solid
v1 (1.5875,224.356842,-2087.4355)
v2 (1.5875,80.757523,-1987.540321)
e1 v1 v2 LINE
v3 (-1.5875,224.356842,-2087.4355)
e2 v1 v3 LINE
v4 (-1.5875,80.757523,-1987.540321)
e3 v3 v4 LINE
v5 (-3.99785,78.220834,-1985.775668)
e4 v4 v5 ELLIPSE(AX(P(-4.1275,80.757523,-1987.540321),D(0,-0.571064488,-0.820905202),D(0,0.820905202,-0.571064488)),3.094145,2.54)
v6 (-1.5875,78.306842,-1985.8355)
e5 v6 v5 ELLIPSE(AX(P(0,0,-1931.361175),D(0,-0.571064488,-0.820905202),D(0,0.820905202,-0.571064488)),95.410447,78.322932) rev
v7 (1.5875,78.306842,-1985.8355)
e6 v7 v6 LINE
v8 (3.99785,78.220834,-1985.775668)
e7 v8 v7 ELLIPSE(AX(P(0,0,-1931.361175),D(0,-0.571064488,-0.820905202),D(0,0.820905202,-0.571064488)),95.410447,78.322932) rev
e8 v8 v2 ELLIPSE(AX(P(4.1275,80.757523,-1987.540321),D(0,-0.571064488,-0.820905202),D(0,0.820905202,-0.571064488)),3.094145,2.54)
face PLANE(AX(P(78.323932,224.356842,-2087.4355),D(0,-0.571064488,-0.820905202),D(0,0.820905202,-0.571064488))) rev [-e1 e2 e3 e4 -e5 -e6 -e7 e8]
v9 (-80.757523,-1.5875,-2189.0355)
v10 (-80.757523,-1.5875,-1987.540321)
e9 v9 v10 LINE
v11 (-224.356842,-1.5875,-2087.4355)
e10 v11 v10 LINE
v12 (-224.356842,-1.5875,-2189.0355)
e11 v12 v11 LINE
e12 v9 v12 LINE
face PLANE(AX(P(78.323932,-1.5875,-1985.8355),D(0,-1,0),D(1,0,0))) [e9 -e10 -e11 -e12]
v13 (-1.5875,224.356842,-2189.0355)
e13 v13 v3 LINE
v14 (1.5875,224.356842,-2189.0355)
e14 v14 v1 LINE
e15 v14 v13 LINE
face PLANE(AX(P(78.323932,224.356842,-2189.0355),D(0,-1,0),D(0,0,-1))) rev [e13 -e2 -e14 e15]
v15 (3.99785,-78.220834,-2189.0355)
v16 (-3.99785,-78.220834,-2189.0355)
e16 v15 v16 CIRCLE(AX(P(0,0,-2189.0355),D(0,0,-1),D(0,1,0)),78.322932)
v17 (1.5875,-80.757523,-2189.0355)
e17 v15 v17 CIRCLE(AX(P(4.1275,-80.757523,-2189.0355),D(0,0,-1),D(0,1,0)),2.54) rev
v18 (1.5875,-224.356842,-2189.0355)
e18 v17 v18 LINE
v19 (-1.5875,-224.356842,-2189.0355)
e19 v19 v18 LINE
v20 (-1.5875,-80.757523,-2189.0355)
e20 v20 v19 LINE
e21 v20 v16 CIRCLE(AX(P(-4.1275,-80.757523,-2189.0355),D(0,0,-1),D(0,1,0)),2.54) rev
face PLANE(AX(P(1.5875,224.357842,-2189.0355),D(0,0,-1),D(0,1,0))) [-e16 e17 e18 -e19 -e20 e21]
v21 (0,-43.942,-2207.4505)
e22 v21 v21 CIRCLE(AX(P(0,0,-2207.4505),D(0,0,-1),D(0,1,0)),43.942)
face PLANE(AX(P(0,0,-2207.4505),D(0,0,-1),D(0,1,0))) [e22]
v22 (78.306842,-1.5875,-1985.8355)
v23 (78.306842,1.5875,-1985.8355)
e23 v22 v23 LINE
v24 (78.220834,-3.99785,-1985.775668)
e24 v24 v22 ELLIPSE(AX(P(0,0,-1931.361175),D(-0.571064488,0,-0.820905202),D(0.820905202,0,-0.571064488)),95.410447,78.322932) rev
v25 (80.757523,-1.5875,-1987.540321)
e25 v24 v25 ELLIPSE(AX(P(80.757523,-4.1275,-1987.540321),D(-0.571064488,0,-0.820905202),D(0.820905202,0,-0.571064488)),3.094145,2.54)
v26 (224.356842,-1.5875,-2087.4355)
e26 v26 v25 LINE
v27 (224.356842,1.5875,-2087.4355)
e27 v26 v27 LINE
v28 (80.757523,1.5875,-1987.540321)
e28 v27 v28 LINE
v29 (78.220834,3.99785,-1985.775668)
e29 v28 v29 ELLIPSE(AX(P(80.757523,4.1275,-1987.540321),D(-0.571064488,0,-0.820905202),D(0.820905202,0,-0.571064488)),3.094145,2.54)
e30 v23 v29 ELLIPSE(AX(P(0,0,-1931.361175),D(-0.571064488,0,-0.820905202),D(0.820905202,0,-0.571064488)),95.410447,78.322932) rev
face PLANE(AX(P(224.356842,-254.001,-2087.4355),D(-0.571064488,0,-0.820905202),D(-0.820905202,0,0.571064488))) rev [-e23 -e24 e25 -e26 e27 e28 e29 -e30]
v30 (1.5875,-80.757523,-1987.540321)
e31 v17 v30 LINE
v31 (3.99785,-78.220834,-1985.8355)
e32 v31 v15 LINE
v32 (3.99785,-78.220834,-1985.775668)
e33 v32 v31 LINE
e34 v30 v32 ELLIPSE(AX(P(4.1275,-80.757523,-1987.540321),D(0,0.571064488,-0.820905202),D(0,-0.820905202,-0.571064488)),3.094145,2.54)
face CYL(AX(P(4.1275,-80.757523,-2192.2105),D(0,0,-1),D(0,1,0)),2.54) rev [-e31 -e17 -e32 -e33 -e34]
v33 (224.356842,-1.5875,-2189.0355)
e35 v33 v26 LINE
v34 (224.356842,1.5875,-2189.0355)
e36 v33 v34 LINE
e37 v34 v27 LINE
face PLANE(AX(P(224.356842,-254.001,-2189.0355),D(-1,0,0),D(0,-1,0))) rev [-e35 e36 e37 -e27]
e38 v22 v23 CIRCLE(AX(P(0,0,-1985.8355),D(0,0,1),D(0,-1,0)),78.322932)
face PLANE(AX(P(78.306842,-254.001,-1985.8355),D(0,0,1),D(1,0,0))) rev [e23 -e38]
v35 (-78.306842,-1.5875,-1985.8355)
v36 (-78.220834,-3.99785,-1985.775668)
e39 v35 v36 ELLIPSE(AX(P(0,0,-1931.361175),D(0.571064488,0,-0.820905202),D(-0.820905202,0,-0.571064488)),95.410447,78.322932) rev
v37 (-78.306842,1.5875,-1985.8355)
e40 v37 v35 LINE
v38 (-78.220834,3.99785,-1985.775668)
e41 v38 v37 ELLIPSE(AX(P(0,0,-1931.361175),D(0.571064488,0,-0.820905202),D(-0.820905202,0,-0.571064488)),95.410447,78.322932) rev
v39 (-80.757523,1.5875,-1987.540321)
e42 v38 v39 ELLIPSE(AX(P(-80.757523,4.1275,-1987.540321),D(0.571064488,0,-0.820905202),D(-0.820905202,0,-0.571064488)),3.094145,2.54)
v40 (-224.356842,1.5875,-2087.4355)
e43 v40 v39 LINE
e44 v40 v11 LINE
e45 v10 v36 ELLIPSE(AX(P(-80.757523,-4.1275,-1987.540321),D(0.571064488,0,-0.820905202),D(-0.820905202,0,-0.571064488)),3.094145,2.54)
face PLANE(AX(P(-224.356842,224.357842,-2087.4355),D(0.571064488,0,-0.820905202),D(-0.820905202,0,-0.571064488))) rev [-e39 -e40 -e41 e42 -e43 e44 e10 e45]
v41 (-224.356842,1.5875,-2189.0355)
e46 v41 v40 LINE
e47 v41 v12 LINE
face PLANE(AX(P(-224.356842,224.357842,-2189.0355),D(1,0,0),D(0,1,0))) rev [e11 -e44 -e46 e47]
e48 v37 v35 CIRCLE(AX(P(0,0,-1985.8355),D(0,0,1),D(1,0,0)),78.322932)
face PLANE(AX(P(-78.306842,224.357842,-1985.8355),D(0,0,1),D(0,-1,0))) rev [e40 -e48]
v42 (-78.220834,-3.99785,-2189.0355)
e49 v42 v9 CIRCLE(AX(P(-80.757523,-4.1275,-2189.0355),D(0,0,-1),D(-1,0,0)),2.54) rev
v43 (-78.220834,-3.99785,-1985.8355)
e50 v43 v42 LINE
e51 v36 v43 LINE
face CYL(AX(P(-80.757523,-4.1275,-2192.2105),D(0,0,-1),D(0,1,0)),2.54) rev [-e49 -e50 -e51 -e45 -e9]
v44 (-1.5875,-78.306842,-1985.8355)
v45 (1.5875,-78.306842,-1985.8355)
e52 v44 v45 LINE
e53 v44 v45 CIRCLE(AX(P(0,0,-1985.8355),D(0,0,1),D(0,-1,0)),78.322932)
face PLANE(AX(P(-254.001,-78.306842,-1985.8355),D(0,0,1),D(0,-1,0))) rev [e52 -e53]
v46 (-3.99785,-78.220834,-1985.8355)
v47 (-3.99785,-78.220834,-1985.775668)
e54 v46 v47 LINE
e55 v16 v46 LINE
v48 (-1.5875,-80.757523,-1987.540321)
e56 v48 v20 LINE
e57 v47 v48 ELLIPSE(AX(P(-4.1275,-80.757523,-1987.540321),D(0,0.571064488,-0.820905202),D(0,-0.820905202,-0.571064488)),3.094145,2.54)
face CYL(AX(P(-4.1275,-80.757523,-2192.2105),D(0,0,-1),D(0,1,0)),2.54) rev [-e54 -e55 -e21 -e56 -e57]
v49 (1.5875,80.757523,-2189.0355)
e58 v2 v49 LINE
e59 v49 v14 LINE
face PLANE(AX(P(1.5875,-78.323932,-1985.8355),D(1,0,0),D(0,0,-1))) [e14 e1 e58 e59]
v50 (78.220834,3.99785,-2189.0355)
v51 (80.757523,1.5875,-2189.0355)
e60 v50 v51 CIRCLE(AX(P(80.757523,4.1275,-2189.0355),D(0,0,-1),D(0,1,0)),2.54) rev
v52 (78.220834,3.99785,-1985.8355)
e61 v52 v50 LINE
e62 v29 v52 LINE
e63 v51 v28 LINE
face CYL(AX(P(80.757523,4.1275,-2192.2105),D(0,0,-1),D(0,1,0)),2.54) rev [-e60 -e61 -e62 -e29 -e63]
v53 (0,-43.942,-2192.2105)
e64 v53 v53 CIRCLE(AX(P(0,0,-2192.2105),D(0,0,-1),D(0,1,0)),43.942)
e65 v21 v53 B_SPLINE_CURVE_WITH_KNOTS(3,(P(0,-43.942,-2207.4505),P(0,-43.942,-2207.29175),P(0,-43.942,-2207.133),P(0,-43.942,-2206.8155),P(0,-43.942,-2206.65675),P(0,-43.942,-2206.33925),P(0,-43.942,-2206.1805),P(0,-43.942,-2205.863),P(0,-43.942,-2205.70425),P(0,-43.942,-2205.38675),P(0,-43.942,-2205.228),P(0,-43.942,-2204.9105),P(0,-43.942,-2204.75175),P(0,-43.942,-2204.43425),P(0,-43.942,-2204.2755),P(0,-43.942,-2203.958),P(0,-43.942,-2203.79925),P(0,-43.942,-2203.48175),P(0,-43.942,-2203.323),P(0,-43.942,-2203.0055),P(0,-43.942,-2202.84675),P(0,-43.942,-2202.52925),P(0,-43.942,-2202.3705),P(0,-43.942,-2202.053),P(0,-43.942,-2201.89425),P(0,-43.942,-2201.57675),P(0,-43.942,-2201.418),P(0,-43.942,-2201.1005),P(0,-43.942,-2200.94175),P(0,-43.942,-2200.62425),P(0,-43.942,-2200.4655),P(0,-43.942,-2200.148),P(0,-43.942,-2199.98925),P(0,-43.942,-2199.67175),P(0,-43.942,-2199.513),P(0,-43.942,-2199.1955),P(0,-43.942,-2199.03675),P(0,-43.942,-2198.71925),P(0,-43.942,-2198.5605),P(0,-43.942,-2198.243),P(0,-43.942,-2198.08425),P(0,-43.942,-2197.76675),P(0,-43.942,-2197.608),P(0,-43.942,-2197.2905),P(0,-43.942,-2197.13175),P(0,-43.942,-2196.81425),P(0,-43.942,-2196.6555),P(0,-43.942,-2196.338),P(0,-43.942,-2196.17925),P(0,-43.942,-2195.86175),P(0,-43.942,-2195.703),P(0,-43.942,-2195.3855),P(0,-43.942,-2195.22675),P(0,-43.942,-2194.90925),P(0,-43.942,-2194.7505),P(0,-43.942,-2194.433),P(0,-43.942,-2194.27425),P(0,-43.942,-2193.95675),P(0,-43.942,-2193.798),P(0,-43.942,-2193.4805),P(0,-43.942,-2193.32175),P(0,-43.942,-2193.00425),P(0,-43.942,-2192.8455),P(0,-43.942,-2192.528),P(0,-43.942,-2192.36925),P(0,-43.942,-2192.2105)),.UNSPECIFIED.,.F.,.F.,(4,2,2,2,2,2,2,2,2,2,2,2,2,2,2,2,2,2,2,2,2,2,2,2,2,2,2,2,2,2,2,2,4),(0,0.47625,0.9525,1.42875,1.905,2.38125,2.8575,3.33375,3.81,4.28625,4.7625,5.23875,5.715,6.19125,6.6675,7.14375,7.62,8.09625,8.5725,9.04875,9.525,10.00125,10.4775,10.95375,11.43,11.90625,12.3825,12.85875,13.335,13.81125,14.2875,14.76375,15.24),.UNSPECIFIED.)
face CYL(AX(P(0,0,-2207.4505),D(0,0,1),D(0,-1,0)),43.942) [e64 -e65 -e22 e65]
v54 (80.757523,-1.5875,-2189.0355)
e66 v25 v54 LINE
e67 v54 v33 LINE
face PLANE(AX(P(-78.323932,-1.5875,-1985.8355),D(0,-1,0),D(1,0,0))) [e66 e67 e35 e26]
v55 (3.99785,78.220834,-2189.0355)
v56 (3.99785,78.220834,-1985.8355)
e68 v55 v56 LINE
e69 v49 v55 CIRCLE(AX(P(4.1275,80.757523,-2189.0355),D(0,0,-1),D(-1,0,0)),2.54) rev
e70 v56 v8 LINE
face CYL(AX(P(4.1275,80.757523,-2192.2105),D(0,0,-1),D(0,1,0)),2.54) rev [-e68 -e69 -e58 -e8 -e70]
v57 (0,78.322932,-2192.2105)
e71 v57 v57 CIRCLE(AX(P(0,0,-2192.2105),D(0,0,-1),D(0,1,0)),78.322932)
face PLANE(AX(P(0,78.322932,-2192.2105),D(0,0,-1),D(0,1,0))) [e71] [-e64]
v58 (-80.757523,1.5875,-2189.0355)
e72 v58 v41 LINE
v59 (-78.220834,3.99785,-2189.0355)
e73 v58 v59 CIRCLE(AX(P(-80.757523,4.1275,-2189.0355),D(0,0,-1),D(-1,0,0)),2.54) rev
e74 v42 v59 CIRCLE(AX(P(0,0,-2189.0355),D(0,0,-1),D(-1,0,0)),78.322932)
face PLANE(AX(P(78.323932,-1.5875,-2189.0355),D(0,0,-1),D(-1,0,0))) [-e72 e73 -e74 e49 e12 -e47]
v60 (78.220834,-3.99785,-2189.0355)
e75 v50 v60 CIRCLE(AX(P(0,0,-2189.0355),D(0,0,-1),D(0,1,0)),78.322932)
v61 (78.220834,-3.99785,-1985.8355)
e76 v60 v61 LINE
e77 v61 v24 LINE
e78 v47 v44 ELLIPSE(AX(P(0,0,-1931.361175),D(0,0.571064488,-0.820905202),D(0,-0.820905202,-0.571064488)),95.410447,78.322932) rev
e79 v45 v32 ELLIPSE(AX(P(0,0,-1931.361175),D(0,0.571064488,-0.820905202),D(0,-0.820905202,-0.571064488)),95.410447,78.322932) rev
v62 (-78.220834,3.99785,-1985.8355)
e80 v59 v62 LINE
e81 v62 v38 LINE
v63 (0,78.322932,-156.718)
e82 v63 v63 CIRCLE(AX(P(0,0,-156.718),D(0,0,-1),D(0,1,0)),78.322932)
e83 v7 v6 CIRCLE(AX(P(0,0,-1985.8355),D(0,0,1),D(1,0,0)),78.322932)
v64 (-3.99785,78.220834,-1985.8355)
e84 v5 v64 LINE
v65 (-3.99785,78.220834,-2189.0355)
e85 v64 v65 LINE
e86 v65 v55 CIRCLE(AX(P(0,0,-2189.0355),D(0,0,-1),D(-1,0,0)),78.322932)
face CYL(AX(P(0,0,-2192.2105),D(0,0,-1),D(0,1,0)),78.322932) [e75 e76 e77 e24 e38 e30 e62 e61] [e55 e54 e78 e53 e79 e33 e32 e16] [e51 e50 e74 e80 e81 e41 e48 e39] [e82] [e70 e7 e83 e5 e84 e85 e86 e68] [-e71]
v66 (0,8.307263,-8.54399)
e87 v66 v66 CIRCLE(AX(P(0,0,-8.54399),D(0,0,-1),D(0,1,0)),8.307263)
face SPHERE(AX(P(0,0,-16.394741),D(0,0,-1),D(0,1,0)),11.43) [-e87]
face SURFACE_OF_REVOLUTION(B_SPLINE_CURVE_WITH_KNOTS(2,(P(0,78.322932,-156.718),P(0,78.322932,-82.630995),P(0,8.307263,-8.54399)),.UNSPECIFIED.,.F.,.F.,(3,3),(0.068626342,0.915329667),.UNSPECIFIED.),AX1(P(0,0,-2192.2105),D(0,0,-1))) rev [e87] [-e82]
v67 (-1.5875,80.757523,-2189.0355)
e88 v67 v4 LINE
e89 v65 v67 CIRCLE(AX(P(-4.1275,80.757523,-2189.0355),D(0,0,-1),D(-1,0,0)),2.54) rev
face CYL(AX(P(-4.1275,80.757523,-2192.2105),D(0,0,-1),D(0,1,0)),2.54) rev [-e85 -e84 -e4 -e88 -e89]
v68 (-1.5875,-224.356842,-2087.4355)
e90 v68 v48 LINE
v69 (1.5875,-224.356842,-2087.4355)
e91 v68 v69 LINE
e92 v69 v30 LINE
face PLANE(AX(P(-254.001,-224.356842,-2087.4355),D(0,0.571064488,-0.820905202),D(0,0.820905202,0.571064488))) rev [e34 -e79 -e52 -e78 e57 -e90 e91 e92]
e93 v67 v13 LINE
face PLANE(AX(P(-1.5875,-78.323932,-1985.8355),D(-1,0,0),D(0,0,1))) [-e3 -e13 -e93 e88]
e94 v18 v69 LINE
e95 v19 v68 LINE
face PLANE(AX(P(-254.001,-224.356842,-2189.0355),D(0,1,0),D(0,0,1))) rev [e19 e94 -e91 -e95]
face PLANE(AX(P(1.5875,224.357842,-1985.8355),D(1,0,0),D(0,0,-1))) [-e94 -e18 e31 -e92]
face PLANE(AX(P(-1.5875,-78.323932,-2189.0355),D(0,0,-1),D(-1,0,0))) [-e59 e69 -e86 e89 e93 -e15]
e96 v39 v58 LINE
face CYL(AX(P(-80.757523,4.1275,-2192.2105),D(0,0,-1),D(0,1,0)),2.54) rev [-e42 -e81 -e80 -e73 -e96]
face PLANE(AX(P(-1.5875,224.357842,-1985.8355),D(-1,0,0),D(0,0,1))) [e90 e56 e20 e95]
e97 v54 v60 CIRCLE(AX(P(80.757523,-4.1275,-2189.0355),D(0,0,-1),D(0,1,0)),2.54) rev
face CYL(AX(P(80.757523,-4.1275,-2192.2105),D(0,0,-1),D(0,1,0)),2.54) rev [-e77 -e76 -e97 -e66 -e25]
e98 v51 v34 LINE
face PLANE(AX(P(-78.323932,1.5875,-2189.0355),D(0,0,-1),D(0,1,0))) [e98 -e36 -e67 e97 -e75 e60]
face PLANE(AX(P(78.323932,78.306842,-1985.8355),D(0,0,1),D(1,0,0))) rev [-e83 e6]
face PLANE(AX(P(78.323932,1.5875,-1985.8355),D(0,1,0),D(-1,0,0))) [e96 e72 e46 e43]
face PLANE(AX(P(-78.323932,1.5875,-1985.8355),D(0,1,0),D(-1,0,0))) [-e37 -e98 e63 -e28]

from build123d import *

# Parameters (mm, degrees)
SKETCH3_R                = 43.942
BOSS_EXTRUDE1_DEPTH      = 15.24
BOSS_EXTRUDE2_REACH      = 2235.699
BOSS_EXTRUDE2_END_RADIUS = 78.32293196
SKETCH4_W                = 3.175
SKETCH4_H                = 203.2
CUT_EXTRUDE1_REACH       = 2225.452
FILLET1_R                = 2.54
CIRPATTERN1_COUNT        = 4
FILLET1_OF_CIRPATTERN1_R = 2.54


with BuildPart() as part:
    # Sketch2 → Revolve1 (revolve)
    with BuildSketch(Plane(origin=(0, 0, 0), x_dir=(0, 0, -1), z_dir=(1, 0, 0))):
        with BuildLine():
            Line((156.718, 78.322932), (2192.2105, 78.322932))
            Line((2192.2105, 78.322932), (2192.2105, 4e-08))
            Line((2192.2105, 4e-08), (4.964740615, 4e-08))
            ThreePointArc((4.964740615, 4e-08), (5.897622526, 4.522765989), (8.543990278, 8.307263076))
            add(Edge.make_bspline(
                [(8.543990278, 8.307263076), (82.630995139, 78.322932), (156.718, 78.322932)],
                knots=[0.068626342, 0.068626342, 0.068626342, 0.915329667, 0.915329667, 0.915329667], degree=2))
        make_face()
    revolve(axis=Axis((0, 4e-08, -2192.2105), (0, 0, 1)))

    # Sketch3 → Boss-Extrude1 (add)
    with BuildSketch(Plane(origin=(0, 0, -2192.2105), x_dir=(-1, 0, 0), z_dir=(0, 0, -1))):
        with Locations(Location((0, 0, 0), (0, 0, 270))):
            Circle(SKETCH3_R)
    extrude(amount=BOSS_EXTRUDE1_DEPTH)

    # Boss-Extrude2: up to this cylinder (the profile starts outside it)
    boss_extrude2_end = Plane(origin=(0, 4e-08, -2087.4355), z_dir=(0, 0, -1)) * Cylinder(BOSS_EXTRUDE2_END_RADIUS, 4629.043863919, mode=Mode.PRIVATE)
    # Sketch4 → Boss-Extrude2 (add, up to the surface)
    with BuildSketch(Plane(origin=(0, 254, 0), x_dir=(1, 0, 0), z_dir=(0, 1, 0)), mode=Mode.PRIVATE) as boss_extrude2_sk1:
        with Locations((0, 2087.4355)):
            Rectangle(SKETCH4_W, SKETCH4_H)
    boss_extrude2_tool1 = extrude(boss_extrude2_sk1.sketch, amount=-BOSS_EXTRUDE2_REACH, mode=Mode.PRIVATE) - boss_extrude2_end
    boss_extrude2 = boss_extrude2_tool1.solids().sort_by_distance((0, 254, -2087.4355))[0]
    add(boss_extrude2)

    # Sketch5 → Cut-Extrude1 (cut, up to next)
    with BuildSketch(Plane.ZY.offset(1.5875), mode=Mode.PRIVATE) as cut_extrude1_sk1:
        Polygon((-2189.0355, 224.356842107), (-2087.4355, 224.356842107), (-1985.8355, 78.306842107), (-1985.8355, 254), (-2189.0355, 254), align=None)
    cut_extrude1_tool1 = extrude(cut_extrude1_sk1.sketch, amount=-CUT_EXTRUDE1_REACH, mode=Mode.PRIVATE) & part.part
    cut_extrude1 = cut_extrude1_tool1.solids().sort_by_distance((-1.5875, 204.128915, -2050.052252))[0]
    add(cut_extrude1, mode=Mode.SUBTRACT)

    # Fillet1
    # the kernel refuses this fillet: 2.54 mm, written as the material it adds along each edge
    with BuildSketch(Plane(origin=(-1.5875, 78.306842107, -1979.708797857), x_dir=(-0.9993639751492599, -0.03566013423796214, 0), z_dir=(0, 0, -1))) as fillet1_piece_1_section:
        with BuildLine():
            CenterArc((2.450992889, 2.539698904), FILLET1_R, 182.043608469, 87.074170623)
            Line((-0.087391608, 2.449122163), (0, 0))
            ThreePointArc((0, 0), (1.205942189, 0.009284527), (2.411884379, 0))
        make_face()
    fillet1_piece_1 = extrude(amount=209.326702143, mode=Mode.PRIVATE)
    fillet1_piece_1 = split(fillet1_piece_1, bisect_by=Plane(origin=(-3.095055571, 78.248638535, -1985.795010558), z_dir=(0, -0.5710644881985977, -0.8209052017854886)), keep=Keep.TOP, mode=Mode.PRIVATE)
    add(fillet1_piece_1)
    with BuildSketch(Plane(origin=(1.5875, 78.306842107, -1979.708797857), x_dir=(0.9993639751492599, -0.035660134237962375, 0), z_dir=(0, 0, -1))) as fillet1_piece_2_section:
        with BuildLine():
            CenterArc((2.450992889, -2.539698904), FILLET1_R, 90.882220908, 87.074170623)
            Line((-0.087391608, -2.449122163), (0, 0))
            ThreePointArc((0, 0), (1.205942189, -0.009284527), (2.411884379, 0))
        make_face()
    fillet1_piece_2 = extrude(amount=209.326702143, mode=Mode.PRIVATE)
    fillet1_piece_2 = split(fillet1_piece_2, bisect_by=Plane(origin=(3.095055571, 78.248638535, -1985.795010558), z_dir=(0, -0.5710644881985977, -0.8209052017854886)), keep=Keep.TOP, mode=Mode.PRIVATE)
    add(fillet1_piece_2)

    # CirPattern1: Boss-Extrude2, Cut-Extrude1 ×4 about axis
    cirpattern1_axis = Axis((0, 1.7e-08, 0), (0, 0, 1))
    add([boss_extrude2.rotate(cirpattern1_axis, i * 360 / CIRPATTERN1_COUNT) for i in range(1, CIRPATTERN1_COUNT)])
    add([cut_extrude1.rotate(cirpattern1_axis, i * 360 / CIRPATTERN1_COUNT) for i in range(1, CIRPATTERN1_COUNT)], mode=Mode.SUBTRACT)

    # Fillet1 of CirPattern1
    # the kernel refuses this fillet: 2.54 mm, written as the material it adds along each edge
    with BuildSketch(Plane(origin=(-78.306842067, -1.587499983, -1979.708797917), x_dir=(0.03566013452716192, -0.9993639751389404, 0), z_dir=(0, 0, -1))) as fillet1_of_cirpattern1_piece_1_section:
        with BuildLine():
            CenterArc((2.450992888, 2.539698904), FILLET1_OF_CIRPATTERN1_R, 182.043608486, 87.074170607)
            Line((-0.087391609, 2.449122163), (0, 0))
            ThreePointArc((0, 0), (1.205942189, 0.009284527), (2.411884378, 0))
        make_face()
    fillet1_of_cirpattern1_piece_1 = extrude(amount=209.326702083, mode=Mode.PRIVATE)
    fillet1_of_cirpattern1_piece_1 = split(fillet1_of_cirpattern1_piece_1, bisect_by=Plane(origin=(-78.248638505, -3.095055439, -1985.79501055), z_dir=(0.5710644881985977, 0, -0.8209052017854886)), keep=Keep.TOP, mode=Mode.PRIVATE)
    add(fillet1_of_cirpattern1_piece_1)
    with BuildSketch(Plane(origin=(-78.306842068, 1.587500017, -1979.708797911), x_dir=(0.03566013394875642, 0.9993639751595796, 0), z_dir=(0, 0, -1))) as fillet1_of_cirpattern1_piece_2_section:
        with BuildLine():
            CenterArc((2.450992889, -2.539698904), FILLET1_OF_CIRPATTERN1_R, 90.882220908, 87.074170639)
            Line((-0.087391608, -2.449122164), (0, 0))
            ThreePointArc((0, 0), (1.20594219, -0.009284527), (2.411884379, 0))
        make_face()
    fillet1_of_cirpattern1_piece_2 = extrude(amount=209.326702089, mode=Mode.PRIVATE)
    fillet1_of_cirpattern1_piece_2 = split(fillet1_of_cirpattern1_piece_2, bisect_by=Plane(origin=(-78.248638506, 3.095055478, -1985.79501055), z_dir=(0.5710644881985977, 0, -0.8209052017854886)), keep=Keep.TOP, mode=Mode.PRIVATE)
    add(fillet1_of_cirpattern1_piece_2)
    with BuildSketch(Plane(origin=(1.5875, -78.306842027, -1979.708797972), x_dir=(0.9993639751492599, 0.03566013423796238, 0), z_dir=(0, 0, -1))) as fillet1_of_cirpattern1_piece_3_section:
        with BuildLine():
            CenterArc((2.450992889, 2.539698904), FILLET1_OF_CIRPATTERN1_R, 182.043608469, 87.074170623)
            Line((-0.087391608, 2.449122163), (0, 0))
            ThreePointArc((0, 0), (1.205942189, 0.009284527), (2.411884379, 0))
        make_face()
    fillet1_of_cirpattern1_piece_3 = extrude(amount=209.326702028, mode=Mode.PRIVATE)
    fillet1_of_cirpattern1_piece_3 = split(fillet1_of_cirpattern1_piece_3, bisect_by=Plane(origin=(3.095055347, -78.248638477, -1985.795010542), z_dir=(0, 0.5710644881985977, -0.8209052017854886)), keep=Keep.TOP, mode=Mode.PRIVATE)
    add(fillet1_of_cirpattern1_piece_3)
    with BuildSketch(Plane(origin=(-1.5875, -78.306842027, -1979.708797972), x_dir=(-0.9993639751492599, 0.03566013423796186, 0), z_dir=(0, 0, -1))) as fillet1_of_cirpattern1_piece_4_section:
        with BuildLine():
            CenterArc((2.450992889, -2.539698904), FILLET1_OF_CIRPATTERN1_R, 90.882220908, 87.074170623)
            Line((-0.087391608, -2.449122163), (0, 0))
            ThreePointArc((0, 0), (1.205942189, -0.009284527), (2.411884379, 0))
        make_face()
    fillet1_of_cirpattern1_piece_4 = extrude(amount=209.326702028, mode=Mode.PRIVATE)
    fillet1_of_cirpattern1_piece_4 = split(fillet1_of_cirpattern1_piece_4, bisect_by=Plane(origin=(-3.095055347, -78.248638477, -1985.795010542), z_dir=(0, 0.5710644881985977, -0.8209052017854886)), keep=Keep.TOP, mode=Mode.PRIVATE)
    add(fillet1_of_cirpattern1_piece_4)
    with BuildSketch(Plane(origin=(78.306842068, 1.587500017, -1979.708797911), x_dir=(-0.03566013394876229, 0.9993639751595792, 0), z_dir=(0, 0, -1))) as fillet1_of_cirpattern1_piece_5_section:
        with BuildLine():
            CenterArc((2.450992889, 2.539698904), FILLET1_OF_CIRPATTERN1_R, 182.043608452, 87.074170639)
            Line((-0.087391608, 2.449122164), (0, 0))
            ThreePointArc((0, 0), (1.20594219, 0.009284527), (2.411884379, 0))
        make_face()
    fillet1_of_cirpattern1_piece_5 = extrude(amount=209.326702089, mode=Mode.PRIVATE)
    fillet1_of_cirpattern1_piece_5 = split(fillet1_of_cirpattern1_piece_5, bisect_by=Plane(origin=(78.248638506, 3.095055478, -1985.79501055), z_dir=(-0.5710644881985977, 0, -0.8209052017854886)), keep=Keep.TOP, mode=Mode.PRIVATE)
    add(fillet1_of_cirpattern1_piece_5)
    with BuildSketch(Plane(origin=(78.306842067, -1.587499983, -1979.708797917), x_dir=(-0.03566013452716244, -0.9993639751389404, 0), z_dir=(0, 0, -1))) as fillet1_of_cirpattern1_piece_6_section:
        with BuildLine():
            CenterArc((2.450992888, -2.539698904), FILLET1_OF_CIRPATTERN1_R, 90.882220908, 87.074170607)
            Line((-0.087391609, -2.449122163), (0, 0))
            ThreePointArc((0, 0), (1.205942189, -0.009284527), (2.411884378, 0))
        make_face()
    fillet1_of_cirpattern1_piece_6 = extrude(amount=209.326702083, mode=Mode.PRIVATE)
    fillet1_of_cirpattern1_piece_6 = split(fillet1_of_cirpattern1_piece_6, bisect_by=Plane(origin=(78.248638505, -3.095055439, -1985.79501055), z_dir=(-0.5710644881985977, 0, -0.8209052017854886)), keep=Keep.TOP, mode=Mode.PRIVATE)
    add(fillet1_of_cirpattern1_piece_6)


solid = part.part
